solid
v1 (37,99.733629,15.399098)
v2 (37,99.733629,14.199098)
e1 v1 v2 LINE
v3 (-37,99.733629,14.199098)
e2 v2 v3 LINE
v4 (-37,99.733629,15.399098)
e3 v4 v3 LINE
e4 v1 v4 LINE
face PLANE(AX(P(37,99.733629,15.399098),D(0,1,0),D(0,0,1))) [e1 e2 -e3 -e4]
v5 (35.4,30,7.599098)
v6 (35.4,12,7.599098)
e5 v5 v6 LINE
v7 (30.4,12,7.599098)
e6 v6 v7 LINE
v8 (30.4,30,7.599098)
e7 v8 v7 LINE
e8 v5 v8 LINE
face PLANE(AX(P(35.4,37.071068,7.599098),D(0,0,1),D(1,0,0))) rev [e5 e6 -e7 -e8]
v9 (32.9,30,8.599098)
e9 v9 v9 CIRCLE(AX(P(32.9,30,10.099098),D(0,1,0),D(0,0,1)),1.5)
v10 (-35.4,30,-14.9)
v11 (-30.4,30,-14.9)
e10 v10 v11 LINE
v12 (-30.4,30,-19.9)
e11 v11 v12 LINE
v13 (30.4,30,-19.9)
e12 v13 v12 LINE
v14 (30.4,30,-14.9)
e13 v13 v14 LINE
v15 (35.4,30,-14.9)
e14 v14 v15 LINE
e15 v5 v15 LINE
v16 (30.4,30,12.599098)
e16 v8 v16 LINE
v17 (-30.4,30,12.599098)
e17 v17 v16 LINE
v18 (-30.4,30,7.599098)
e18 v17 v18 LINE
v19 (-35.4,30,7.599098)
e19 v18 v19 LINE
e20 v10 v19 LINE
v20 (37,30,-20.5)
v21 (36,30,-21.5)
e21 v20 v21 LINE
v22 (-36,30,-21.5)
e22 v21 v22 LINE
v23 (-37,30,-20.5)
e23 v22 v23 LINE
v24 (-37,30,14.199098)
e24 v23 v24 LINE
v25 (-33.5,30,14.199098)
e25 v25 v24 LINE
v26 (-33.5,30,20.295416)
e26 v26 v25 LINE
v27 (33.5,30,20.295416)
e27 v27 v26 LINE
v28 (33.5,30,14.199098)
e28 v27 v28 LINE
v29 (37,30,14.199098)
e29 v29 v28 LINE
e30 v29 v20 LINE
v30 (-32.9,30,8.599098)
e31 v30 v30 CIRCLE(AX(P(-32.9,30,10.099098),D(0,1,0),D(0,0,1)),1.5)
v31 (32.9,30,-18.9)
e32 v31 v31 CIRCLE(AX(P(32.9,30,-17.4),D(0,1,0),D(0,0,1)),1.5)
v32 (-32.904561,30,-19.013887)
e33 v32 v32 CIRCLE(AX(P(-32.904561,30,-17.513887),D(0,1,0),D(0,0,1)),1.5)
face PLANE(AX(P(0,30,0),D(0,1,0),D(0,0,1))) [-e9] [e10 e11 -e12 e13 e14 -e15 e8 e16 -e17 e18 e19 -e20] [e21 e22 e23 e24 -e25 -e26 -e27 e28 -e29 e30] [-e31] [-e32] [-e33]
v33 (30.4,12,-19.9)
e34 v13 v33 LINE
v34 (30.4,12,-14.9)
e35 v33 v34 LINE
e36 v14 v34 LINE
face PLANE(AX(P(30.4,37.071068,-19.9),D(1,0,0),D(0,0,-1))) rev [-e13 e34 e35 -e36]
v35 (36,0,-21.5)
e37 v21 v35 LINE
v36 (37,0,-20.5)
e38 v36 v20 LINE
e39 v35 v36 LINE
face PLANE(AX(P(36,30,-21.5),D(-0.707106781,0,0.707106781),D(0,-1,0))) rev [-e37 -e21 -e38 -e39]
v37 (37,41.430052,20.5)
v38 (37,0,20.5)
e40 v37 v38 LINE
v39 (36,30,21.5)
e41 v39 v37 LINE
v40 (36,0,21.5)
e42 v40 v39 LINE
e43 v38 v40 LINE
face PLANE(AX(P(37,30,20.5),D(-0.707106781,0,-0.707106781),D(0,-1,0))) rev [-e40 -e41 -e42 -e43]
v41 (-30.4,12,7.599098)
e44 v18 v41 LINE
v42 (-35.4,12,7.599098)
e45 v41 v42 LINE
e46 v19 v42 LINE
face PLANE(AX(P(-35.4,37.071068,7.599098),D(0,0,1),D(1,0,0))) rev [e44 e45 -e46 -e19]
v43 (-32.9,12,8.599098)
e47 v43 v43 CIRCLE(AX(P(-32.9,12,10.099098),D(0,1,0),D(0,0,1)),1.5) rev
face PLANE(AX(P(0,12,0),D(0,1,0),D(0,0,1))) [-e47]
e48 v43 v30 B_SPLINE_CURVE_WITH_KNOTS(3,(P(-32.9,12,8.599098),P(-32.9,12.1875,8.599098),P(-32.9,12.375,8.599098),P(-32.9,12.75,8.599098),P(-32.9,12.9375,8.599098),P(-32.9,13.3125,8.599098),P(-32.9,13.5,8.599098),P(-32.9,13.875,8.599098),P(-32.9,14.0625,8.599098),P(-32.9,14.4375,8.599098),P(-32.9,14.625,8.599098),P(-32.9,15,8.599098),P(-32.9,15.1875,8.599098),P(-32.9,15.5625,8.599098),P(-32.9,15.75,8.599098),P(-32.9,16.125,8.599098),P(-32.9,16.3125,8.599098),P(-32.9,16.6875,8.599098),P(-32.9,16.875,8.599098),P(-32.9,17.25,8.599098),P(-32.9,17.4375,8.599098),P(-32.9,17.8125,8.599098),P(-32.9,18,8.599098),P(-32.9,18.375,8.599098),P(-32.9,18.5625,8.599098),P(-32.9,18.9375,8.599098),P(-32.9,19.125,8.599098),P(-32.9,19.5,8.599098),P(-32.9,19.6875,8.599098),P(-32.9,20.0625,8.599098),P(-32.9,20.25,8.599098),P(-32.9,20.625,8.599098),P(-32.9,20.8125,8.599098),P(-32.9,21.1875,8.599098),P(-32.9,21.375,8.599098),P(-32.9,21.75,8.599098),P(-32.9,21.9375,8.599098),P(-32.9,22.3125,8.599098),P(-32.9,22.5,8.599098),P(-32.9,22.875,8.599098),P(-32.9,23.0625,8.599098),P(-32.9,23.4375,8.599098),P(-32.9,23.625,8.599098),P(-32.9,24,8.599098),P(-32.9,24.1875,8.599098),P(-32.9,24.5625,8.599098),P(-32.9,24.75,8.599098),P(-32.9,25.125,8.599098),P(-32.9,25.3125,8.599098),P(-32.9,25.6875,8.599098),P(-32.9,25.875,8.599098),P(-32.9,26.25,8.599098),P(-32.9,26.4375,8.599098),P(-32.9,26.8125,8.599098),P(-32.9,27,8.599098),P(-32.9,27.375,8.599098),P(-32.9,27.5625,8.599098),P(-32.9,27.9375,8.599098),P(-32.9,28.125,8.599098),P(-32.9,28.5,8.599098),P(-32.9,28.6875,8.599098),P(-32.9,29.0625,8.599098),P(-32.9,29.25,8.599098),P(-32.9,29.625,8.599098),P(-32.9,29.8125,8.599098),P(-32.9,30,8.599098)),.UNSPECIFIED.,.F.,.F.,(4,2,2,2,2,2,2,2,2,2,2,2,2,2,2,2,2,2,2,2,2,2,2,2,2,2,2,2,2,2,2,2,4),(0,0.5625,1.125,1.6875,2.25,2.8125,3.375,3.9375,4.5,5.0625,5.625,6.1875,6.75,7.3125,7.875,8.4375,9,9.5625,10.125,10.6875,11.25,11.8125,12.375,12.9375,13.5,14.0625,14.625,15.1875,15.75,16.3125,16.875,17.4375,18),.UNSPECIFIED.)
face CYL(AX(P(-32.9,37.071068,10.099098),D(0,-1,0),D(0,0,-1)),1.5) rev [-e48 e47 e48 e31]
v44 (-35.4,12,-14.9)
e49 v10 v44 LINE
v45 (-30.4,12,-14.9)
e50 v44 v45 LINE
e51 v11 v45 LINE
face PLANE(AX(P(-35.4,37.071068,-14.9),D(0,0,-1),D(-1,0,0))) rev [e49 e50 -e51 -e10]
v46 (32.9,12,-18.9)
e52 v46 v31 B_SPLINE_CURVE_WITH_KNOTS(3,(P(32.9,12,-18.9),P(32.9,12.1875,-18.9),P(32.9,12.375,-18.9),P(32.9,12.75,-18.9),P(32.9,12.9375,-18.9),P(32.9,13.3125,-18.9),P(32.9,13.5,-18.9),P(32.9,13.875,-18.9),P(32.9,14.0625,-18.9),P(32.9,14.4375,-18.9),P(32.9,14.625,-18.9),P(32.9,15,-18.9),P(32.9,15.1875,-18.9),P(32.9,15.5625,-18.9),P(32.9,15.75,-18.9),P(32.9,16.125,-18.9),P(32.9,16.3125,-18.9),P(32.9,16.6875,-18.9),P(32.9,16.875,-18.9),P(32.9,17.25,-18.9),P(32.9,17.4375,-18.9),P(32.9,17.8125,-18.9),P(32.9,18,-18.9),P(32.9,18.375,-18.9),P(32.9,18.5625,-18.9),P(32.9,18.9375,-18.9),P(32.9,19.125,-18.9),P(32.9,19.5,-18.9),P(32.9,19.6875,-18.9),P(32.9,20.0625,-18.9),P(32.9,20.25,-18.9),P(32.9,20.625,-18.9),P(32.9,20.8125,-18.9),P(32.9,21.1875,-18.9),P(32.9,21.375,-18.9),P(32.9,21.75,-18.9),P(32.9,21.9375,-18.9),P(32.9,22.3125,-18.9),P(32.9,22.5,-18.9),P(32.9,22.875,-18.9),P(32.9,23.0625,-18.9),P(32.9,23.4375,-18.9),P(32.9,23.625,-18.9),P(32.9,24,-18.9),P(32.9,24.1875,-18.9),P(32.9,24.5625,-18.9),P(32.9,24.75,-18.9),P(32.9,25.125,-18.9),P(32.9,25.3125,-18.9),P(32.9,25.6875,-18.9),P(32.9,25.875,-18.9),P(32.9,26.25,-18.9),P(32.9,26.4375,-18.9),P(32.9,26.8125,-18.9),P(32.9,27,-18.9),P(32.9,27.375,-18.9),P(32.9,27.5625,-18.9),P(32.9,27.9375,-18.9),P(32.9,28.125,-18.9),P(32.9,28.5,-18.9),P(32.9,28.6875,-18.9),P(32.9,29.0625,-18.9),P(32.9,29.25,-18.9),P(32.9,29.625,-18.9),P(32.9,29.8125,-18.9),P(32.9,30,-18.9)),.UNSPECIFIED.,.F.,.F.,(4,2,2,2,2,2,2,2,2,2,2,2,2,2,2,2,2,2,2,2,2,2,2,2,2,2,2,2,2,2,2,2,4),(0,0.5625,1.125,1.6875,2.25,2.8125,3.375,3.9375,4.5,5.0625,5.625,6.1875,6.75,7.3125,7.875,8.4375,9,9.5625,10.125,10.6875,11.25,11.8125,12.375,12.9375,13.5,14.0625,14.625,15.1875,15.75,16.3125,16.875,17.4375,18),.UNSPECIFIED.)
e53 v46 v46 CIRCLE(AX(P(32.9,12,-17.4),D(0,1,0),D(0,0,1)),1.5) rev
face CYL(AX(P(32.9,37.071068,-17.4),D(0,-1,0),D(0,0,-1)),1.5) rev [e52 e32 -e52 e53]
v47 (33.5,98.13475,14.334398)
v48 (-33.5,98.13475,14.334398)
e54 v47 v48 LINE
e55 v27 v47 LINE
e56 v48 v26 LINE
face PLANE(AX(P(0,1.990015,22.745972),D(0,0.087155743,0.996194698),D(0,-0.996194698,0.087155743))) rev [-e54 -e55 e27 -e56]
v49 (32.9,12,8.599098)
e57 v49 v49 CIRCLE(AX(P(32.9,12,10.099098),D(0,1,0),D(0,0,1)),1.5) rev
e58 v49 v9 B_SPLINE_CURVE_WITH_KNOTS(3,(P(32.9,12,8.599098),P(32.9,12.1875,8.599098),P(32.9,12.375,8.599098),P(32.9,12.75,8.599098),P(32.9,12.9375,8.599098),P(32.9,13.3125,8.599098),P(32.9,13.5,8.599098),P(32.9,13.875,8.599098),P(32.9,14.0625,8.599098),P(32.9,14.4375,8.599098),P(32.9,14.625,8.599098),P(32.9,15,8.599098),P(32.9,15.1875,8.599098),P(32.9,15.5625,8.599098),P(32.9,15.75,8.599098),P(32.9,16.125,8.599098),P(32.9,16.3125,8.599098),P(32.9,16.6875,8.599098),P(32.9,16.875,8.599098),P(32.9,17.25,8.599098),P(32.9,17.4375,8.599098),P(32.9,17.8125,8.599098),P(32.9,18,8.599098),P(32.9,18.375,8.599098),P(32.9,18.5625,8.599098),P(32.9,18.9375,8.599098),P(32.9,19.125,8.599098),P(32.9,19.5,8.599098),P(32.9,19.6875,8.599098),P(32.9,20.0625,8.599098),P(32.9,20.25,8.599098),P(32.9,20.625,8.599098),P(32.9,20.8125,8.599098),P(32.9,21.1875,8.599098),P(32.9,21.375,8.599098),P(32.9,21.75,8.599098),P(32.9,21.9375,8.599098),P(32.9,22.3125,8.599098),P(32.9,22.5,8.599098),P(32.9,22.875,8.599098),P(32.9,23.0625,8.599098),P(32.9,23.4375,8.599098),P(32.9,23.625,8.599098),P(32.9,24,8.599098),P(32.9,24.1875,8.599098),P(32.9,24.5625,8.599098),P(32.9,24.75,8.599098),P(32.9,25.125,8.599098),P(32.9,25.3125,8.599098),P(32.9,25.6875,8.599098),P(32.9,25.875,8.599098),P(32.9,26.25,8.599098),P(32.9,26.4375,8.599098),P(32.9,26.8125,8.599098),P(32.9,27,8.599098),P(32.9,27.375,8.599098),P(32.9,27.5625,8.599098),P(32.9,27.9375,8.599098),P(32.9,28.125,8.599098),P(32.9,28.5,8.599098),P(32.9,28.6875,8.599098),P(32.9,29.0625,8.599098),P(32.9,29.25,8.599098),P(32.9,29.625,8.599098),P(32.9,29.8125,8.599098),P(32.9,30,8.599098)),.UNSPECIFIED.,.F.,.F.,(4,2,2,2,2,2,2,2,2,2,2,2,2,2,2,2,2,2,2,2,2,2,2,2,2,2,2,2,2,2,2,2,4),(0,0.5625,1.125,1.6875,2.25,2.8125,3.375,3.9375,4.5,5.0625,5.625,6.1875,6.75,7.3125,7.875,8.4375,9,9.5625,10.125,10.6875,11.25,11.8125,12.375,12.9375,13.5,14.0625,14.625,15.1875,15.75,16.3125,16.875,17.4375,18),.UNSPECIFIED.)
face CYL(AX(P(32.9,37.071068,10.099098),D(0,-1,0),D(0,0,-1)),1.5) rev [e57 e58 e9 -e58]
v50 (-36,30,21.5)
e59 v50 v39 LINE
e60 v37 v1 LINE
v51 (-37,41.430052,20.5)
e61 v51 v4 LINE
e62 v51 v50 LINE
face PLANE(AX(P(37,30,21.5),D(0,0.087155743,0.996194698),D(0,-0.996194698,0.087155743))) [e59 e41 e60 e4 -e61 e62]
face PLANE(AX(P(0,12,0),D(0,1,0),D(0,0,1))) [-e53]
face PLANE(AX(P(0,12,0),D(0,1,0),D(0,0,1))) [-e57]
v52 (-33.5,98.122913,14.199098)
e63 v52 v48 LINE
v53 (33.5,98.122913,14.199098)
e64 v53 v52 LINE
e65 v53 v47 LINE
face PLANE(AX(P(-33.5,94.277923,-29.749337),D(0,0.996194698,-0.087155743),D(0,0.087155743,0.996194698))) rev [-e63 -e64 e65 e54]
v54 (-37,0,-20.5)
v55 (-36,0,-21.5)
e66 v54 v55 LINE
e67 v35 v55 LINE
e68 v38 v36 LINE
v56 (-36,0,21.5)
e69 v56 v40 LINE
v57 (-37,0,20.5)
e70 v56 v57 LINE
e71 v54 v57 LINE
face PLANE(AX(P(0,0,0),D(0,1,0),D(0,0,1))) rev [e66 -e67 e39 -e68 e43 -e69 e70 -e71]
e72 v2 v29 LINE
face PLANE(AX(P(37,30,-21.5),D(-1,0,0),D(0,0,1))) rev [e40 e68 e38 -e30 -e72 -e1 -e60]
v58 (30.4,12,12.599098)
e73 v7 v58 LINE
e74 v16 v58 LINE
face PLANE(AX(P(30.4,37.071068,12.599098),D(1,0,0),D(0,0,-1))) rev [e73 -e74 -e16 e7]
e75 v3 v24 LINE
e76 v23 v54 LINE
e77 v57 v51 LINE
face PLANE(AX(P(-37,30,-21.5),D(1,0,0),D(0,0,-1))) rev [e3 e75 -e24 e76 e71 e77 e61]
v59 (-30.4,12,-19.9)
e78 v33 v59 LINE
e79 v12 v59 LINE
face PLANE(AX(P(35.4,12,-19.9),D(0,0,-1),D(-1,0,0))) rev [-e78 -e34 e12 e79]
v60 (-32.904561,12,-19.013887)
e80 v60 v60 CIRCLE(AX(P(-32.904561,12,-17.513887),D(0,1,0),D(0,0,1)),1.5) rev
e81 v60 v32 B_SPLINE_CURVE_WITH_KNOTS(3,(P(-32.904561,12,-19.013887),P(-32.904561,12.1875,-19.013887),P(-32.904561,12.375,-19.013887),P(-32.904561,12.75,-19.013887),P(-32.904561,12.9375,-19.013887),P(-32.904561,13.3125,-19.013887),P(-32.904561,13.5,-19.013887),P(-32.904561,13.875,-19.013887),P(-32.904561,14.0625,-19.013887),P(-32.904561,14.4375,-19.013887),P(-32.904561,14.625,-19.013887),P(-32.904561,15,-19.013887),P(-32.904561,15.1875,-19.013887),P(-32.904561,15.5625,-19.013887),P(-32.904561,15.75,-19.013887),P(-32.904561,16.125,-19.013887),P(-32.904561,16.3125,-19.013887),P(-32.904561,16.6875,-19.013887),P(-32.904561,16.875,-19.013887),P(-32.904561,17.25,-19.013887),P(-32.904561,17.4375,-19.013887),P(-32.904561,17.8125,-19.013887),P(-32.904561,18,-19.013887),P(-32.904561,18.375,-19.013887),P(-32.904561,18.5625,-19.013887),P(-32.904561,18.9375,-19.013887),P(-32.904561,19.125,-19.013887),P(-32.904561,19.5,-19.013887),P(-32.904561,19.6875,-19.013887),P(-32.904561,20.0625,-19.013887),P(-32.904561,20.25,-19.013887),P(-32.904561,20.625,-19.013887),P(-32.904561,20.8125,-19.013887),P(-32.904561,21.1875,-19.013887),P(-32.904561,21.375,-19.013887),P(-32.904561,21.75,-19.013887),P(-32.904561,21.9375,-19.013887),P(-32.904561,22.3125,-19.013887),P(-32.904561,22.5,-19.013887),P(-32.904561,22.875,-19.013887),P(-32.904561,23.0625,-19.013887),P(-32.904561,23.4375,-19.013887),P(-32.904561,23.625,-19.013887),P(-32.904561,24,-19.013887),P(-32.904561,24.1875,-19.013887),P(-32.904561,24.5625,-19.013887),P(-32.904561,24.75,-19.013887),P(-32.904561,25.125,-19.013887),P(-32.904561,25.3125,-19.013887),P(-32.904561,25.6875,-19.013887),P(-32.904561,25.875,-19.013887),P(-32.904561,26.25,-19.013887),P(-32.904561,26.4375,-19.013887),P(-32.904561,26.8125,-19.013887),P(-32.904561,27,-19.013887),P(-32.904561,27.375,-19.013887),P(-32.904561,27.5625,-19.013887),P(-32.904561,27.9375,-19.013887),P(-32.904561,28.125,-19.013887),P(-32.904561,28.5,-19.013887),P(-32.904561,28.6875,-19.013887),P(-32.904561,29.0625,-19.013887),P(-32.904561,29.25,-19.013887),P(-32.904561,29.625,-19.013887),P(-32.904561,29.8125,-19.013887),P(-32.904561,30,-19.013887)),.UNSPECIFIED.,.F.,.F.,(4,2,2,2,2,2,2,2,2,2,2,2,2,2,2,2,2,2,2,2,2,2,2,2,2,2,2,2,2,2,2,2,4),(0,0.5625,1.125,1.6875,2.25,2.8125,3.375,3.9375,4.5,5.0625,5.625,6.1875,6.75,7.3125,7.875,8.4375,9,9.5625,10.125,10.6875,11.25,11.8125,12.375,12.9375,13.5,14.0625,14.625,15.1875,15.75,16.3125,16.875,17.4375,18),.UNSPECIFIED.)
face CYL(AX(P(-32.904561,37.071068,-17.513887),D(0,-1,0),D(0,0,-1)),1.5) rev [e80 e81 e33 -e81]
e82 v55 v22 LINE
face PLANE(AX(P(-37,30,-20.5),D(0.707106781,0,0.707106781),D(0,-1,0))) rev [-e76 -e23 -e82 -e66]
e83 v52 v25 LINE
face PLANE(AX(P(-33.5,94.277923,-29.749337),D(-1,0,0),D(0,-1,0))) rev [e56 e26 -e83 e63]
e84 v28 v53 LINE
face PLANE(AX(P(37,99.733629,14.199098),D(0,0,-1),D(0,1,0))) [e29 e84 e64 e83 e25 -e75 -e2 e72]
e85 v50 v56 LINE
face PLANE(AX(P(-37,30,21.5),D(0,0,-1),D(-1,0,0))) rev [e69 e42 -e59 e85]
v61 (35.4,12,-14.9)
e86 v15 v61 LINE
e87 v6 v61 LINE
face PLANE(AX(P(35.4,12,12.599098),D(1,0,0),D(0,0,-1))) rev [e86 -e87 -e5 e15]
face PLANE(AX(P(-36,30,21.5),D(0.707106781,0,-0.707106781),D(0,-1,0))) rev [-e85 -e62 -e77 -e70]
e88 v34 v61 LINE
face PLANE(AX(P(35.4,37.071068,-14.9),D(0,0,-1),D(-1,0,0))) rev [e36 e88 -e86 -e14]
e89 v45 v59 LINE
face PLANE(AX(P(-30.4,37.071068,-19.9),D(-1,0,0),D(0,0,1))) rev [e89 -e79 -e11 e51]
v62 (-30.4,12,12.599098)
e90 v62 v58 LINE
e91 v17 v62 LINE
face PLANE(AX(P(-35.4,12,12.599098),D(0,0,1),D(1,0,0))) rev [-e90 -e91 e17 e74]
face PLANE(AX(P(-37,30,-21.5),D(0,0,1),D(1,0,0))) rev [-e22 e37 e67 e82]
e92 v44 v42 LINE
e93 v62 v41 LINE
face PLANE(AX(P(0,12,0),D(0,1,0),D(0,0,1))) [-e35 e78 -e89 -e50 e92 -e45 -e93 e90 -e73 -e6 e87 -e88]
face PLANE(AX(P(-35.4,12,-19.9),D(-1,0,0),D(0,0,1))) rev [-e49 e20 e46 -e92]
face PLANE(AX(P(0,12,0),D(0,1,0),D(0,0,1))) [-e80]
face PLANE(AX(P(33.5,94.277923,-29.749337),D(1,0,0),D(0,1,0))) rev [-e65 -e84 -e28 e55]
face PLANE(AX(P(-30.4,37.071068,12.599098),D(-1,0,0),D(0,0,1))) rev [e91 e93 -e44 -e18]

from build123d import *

# Parameters (mm, degrees)
SKETCH_1_W          = 74
SKETCH_1_H          = 43
EXTRUDE_1_DEPTH     = 30
EXTRUDE_4_DEPTH     = 74
CUT_EXTRUDE_2_REACH = 115.492
SKETCH_8_W          = 67
SKETCH_8_H          = 67
SKETCH_10_W         = 70.8
SKETCH_10_H         = 32.499098008
CUT_EXTRUDE_3_DEPTH = 18
CUT_EXTRUDE_5_REACH = 114.206
SKETCH_11_W         = 67
SKETCH_11_H         = 1.389705156
SKETCH_12_W         = 5
SKETCH_12_H         = 5
SKETCH_12_R         = 1.5
EXTRUDE_6_DEPTH     = 18
CHAMFER_1_SIZE      = 1


with BuildPart() as part:
    # 草图1 → 凸台-拉伸1 (new body)
    with BuildSketch(Plane(origin=(0, 0, 0), x_dir=(1, 0, 0), z_dir=(0, 1, 0))):
        Rectangle(SKETCH_1_W, SKETCH_1_H)
    extrude(amount=EXTRUDE_1_DEPTH)

    # 草图7 → 凸台-拉伸4 (add, through all)
    with BuildSketch(Plane.ZY.offset(37)):
        Polygon((21.5, 30), (15.399098008, 99.733628866), (14.199098008, 99.733628866), (14.199098008, 30), align=None)
    extrude(amount=-EXTRUDE_4_DEPTH)

    # 切除-拉伸2: up to this plane
    cut_extrude_2_end = Plane(origin=(37, 99.733628866, 14.199098008), z_dir=(0, 0, -1))
    # 草图8 → 切除-拉伸2 (cut, up to the surface)
    with BuildSketch(Plane(origin=(0, 1.990014723, 22.745972372), x_dir=(1, 0, 0), z_dir=(0, 0.08715574274766194, 0.9961946980917453)), mode=Mode.PRIVATE) as cut_extrude_2_sk1:
        with Locations((0, 63.011992474)):
            Rectangle(SKETCH_8_W, SKETCH_8_H)
    cut_extrude_2_tool1 = split(extrude(cut_extrude_2_sk1.sketch, amount=-CUT_EXTRUDE_2_REACH, mode=Mode.PRIVATE), bisect_by=cut_extrude_2_end, keep=Keep.BOTH, mode=Mode.PRIVATE)
    add(cut_extrude_2_tool1.solids().sort_by_distance((0, 64.762228, 17.254115))[0], mode=Mode.SUBTRACT)

    # 草图10 → 切除-拉伸3 (cut)
    with BuildSketch(Plane(origin=(0, 30, 0), x_dir=(1, 0, 0), z_dir=(0, 1, 0))):
        with Locations((0, 3.650450996)):
            Rectangle(SKETCH_10_W, SKETCH_10_H)
    extrude(amount=-CUT_EXTRUDE_3_DEPTH, mode=Mode.SUBTRACT)

    # 切除-拉伸5: up to this face of the body (flat: up to its plane)
    cut_extrude_5_end = Plane(part.part.faces().sort_by_distance((0, 64.762227542, 17.254115366))[0])
    # 草图11 → 切除-拉伸5 (cut, up to the picked face)
    with BuildSketch(Plane(origin=(0, 0, 14.199098008), x_dir=(-1, 0, 0), z_dir=(0, 0, -1)), mode=Mode.PRIVATE) as cut_extrude_5_sk1:
        with Locations((0, 30.694852578)):
            Rectangle(SKETCH_11_W, SKETCH_11_H)
    cut_extrude_5_tool1 = split(extrude(cut_extrude_5_sk1.sketch, amount=-CUT_EXTRUDE_5_REACH, mode=Mode.PRIVATE), bisect_by=cut_extrude_5_end, keep=Keep.BOTH, mode=Mode.PRIVATE)
    add(cut_extrude_5_tool1.solids().sort_by(Axis((0, 30.694853, 14.199098), (0, 0, 1)))[0], mode=Mode.SUBTRACT)

    # 草图12 → 凸台-拉伸6 (add)
    # profile 1 of 4: a face of its own
    with BuildSketch(Plane(origin=(0, 12, 0), x_dir=(1, 0, 0), z_dir=(0, 1, 0))):
        with Locations((-32.9, 17.4)):
            Rectangle(SKETCH_12_W, SKETCH_12_H)
        with Locations(Location((-32.904560765, 17.513886845, 0), (0, 0, 90))):
            Circle(SKETCH_12_R, mode=Mode.SUBTRACT)
    # profile 2 of 4: a face of its own
    with BuildSketch(Plane(origin=(0, 12, 0), x_dir=(1, 0, 0), z_dir=(0, 1, 0))):
        with Locations((32.9, 17.4)):
            Rectangle(SKETCH_12_W, SKETCH_12_H)
        with Locations(Location((32.9, 17.4, 0), (0, 0, 90))):
            Circle(SKETCH_12_R, mode=Mode.SUBTRACT)
    # profile 3 of 4: a face of its own
    with BuildSketch(Plane(origin=(0, 12, 0), x_dir=(1, 0, 0), z_dir=(0, 1, 0))):
        with Locations((-32.9, -10.099098008)):
            Rectangle(SKETCH_12_W, SKETCH_12_H)
        with Locations(Location((-32.9, -10.099098008, 0), (0, 0, 90))):
            Circle(SKETCH_12_R, mode=Mode.SUBTRACT)
    # profile 4 of 4: a face of its own
    with BuildSketch(Plane(origin=(0, 12, 0), x_dir=(1, 0, 0), z_dir=(0, 1, 0))):
        with Locations((32.9, -10.099098008)):
            Rectangle(SKETCH_12_W, SKETCH_12_H)
        with Locations(Location((32.9, -10.099098008, 0), (0, 0, 90))):
            Circle(SKETCH_12_R, mode=Mode.SUBTRACT)
    extrude(amount=EXTRUDE_6_DEPTH)

    # 倒角1
    # the kernel refuses this chamfer: 1 mm, written as the material it takes off along each edge
    with BuildSketch(Plane(origin=(37, -2.571682988, 21.5), x_dir=(0, 0, -1), z_dir=(0, 1, 0))) as chamfer_1_piece_1:
        Polygon((CHAMFER_1_SIZE, 0), (0, CHAMFER_1_SIZE), (0, 0), align=None)
    extrude(amount=45.430097928, mode=Mode.SUBTRACT)
    with BuildSketch(Plane(origin=(-37, -2.571682988, 21.5), x_dir=(0, 0, -1), z_dir=(0, 1, 0))) as chamfer_1_piece_2:
        Polygon((CHAMFER_1_SIZE, 0), (0, -CHAMFER_1_SIZE), (0, 0), align=None)
    extrude(amount=45.430097928, mode=Mode.SUBTRACT)
    with BuildSketch(Plane(origin=(-37, -2.571682988, -21.5), x_dir=(1, 0, 0), z_dir=(0, 1, 0))) as chamfer_1_piece_3:
        Polygon((CHAMFER_1_SIZE, 0), (0, -CHAMFER_1_SIZE), (0, 0), align=None)
    extrude(amount=35.143365976, mode=Mode.SUBTRACT)
    with BuildSketch(Plane(origin=(37, -2.571682988, -21.5), x_dir=(-1, 0, 0), z_dir=(0, 1, 0))) as chamfer_1_piece_4:
        Polygon((CHAMFER_1_SIZE, 0), (0, CHAMFER_1_SIZE), (0, 0), align=None)
    extrude(amount=35.143365976, mode=Mode.SUBTRACT)


solid = part.part
